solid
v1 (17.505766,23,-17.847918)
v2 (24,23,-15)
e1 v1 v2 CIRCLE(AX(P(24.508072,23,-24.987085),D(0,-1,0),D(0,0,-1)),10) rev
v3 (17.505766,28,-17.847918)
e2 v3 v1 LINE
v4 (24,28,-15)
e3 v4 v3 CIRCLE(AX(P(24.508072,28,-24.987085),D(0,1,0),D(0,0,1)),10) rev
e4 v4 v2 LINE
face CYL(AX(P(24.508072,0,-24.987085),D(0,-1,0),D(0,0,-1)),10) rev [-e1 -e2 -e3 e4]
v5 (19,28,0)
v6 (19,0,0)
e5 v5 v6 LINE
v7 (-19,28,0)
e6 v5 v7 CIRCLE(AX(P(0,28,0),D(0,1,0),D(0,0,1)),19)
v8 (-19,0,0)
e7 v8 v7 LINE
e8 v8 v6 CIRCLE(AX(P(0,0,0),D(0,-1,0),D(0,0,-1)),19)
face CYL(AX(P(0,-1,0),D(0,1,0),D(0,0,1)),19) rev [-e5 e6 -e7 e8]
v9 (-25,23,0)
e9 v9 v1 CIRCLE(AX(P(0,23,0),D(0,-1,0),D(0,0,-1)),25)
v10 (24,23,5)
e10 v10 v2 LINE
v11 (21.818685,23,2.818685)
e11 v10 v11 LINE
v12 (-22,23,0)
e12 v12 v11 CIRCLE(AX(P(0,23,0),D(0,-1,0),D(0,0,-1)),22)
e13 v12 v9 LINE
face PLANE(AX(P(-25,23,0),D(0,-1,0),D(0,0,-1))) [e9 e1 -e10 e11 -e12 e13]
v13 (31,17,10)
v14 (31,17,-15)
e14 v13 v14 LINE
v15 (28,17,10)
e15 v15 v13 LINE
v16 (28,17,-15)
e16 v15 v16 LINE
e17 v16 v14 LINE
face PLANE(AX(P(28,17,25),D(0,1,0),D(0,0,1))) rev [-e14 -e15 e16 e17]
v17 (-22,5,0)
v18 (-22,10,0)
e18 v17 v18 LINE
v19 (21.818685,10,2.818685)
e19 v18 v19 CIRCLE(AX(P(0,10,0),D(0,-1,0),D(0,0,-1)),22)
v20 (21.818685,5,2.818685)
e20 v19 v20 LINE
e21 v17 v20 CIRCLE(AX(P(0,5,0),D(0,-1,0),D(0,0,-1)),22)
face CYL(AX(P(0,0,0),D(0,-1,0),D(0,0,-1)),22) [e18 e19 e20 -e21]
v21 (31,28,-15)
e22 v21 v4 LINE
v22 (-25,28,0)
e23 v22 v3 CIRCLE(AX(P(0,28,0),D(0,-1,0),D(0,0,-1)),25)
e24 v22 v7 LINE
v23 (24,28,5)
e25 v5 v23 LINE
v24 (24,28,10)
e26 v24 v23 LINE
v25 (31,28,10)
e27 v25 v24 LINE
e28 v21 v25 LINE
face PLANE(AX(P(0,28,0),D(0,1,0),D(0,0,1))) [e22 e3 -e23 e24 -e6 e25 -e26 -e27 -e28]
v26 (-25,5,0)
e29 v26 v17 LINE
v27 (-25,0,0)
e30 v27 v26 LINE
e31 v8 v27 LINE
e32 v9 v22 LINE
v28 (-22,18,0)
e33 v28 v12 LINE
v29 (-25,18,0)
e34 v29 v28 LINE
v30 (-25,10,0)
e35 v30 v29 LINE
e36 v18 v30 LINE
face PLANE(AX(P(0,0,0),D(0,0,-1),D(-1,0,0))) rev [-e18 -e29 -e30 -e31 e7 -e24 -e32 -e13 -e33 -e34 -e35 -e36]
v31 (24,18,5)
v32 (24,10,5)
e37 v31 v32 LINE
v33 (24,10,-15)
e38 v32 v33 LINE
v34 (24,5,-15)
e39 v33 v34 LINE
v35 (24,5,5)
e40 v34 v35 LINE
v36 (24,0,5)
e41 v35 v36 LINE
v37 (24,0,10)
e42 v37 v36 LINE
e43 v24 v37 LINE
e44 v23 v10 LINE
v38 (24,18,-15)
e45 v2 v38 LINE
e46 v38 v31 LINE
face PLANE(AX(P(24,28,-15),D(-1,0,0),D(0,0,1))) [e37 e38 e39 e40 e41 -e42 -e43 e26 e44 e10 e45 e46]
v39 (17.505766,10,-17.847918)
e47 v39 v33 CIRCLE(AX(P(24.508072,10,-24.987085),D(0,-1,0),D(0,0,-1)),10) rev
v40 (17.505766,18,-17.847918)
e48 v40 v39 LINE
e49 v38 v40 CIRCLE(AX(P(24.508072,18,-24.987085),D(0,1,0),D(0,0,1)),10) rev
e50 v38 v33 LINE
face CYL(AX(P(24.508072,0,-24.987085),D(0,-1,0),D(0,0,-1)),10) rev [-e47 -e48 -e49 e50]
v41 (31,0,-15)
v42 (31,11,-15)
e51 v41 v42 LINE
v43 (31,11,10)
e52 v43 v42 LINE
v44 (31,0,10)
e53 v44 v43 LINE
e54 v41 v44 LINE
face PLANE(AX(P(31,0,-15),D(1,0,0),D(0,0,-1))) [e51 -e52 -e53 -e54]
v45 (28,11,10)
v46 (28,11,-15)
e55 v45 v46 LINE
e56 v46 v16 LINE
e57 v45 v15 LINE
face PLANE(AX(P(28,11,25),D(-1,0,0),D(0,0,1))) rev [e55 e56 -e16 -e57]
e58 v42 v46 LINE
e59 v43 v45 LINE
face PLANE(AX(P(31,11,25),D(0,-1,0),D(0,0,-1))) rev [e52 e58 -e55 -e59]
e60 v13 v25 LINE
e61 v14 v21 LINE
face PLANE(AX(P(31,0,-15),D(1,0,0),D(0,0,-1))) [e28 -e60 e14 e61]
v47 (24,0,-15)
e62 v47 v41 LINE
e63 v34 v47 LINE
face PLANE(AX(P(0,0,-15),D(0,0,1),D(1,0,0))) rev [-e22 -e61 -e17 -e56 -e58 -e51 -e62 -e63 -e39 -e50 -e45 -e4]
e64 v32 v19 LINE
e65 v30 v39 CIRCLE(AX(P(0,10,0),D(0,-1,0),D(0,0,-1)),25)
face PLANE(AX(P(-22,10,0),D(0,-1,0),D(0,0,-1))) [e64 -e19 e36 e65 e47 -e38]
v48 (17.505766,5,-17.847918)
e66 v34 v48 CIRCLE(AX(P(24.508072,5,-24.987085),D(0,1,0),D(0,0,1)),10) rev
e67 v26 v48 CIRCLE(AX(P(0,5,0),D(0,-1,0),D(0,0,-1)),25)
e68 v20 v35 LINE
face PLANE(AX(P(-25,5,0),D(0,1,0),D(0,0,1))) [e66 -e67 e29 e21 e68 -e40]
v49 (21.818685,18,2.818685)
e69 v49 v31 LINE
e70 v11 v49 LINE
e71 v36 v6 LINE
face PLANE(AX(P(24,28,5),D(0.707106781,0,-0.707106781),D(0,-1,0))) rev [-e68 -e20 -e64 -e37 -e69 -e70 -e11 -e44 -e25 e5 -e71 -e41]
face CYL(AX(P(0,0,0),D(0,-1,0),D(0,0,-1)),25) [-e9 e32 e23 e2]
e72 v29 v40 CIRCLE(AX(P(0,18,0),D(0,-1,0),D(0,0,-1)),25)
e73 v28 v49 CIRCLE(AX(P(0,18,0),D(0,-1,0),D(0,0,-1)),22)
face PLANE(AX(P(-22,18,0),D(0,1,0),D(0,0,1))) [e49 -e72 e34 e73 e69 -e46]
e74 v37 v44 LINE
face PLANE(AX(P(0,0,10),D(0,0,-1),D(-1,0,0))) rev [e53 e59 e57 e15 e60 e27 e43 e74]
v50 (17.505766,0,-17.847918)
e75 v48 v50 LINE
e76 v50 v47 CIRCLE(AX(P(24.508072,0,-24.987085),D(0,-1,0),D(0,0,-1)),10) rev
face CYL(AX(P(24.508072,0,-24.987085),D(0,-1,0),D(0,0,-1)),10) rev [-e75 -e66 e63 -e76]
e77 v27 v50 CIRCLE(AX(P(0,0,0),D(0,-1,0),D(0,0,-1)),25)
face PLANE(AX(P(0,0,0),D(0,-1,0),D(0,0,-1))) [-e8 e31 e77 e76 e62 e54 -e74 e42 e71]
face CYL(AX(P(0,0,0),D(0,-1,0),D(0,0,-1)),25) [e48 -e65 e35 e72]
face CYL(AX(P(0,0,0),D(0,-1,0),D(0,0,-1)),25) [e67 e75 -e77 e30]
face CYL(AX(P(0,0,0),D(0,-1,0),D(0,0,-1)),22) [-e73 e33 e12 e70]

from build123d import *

# Parameters (mm, degrees)
REVOLUCI_N1_ANGLE       = 180
CROQUIS2_R              = 19
CORTAR_EXTRUIR1_DEPTH   = 29
SALIENTE_EXTRUIR1_DEPTH = 15
CROQUIS4_W              = 7
CROQUIS4_H              = 28
SALIENTE_EXTRUIR2_DEPTH = 10
CHAFL_N1_SIZE           = 5
REDONDEO1_R             = 10
CORTAR_EXTRUIR2_DEPTH   = 40


with BuildPart() as part:
    # Croquis1 → Revolución1 (revolve)
    with BuildSketch(Plane.XY):
        Polygon((0, 0), (0, 28), (25, 28), (25, 23), (22, 23), (22, 18), (25, 18), (25, 10), (22, 10), (22, 5), (25, 5), (25, 0), align=None)
    revolve(axis=Axis((0, 0, 0), (0, 1, 0)), revolution_arc=REVOLUCI_N1_ANGLE)

    # Croquis2 → Cortar-Extruir1 (cut)
    with BuildSketch(Plane(origin=(0, 28, 0), x_dir=(1, 0, 0), z_dir=(0, 1, 0))):
        Circle(CROQUIS2_R)
    extrude(amount=-CORTAR_EXTRUIR1_DEPTH, mode=Mode.SUBTRACT)

    # Croquis3 → Saliente-Extruir1 (add)
    with BuildSketch(Plane.XY):
        Polygon((25, 28), (24, 28), (24, 0), (31, 0), (31, 28), align=None)
    extrude(amount=-SALIENTE_EXTRUIR1_DEPTH)

    # Croquis4 → Saliente-Extruir2 (add)
    with BuildSketch(Plane.XY):
        with Locations((27.5, 14)):
            Rectangle(CROQUIS4_W, CROQUIS4_H)
    extrude(amount=SALIENTE_EXTRUIR2_DEPTH)

    # Chaflán1
    # the kernel refuses this chamfer: 5 mm, written as the material it adds along each edge
    with BuildSketch(Plane(origin=(24, 10.14158506, 0), x_dir=(0.027495876610586317, 0, 0.9996219169112968), z_dir=(0, 1, 0))) as chafl_n1_piece_1_section:
        Polygon((CHAFL_N1_SIZE * 0.999621916911, -CHAFL_N1_SIZE * 0.0274958766106), (-CHAFL_N1_SIZE * 0.0274958766106, -CHAFL_N1_SIZE * 0.999621916911), (0, 0), align=None)
    chafl_n1_piece_1 = extrude(amount=30.71682988, mode=Mode.PRIVATE)
    chafl_n1_piece_1 = split(chafl_n1_piece_1, bisect_by=Plane(origin=(23.057401275, 18, 2.044863286), z_dir=(0, -1, 0)), keep=Keep.TOP, mode=Mode.PRIVATE)
    add(chafl_n1_piece_1)
    with BuildSketch(Plane(origin=(24, 10.14158506, 0), x_dir=(0.027495876610586317, 0, 0.9996219169112968), z_dir=(0, 1, 0))) as chafl_n1_piece_2_section:
        Polygon((CHAFL_N1_SIZE * 0.999621916911, -CHAFL_N1_SIZE * 0.0274958766106), (-CHAFL_N1_SIZE * 0.0274958766106, -CHAFL_N1_SIZE * 0.999621916911), (0, 0), align=None)
    chafl_n1_piece_2 = extrude(amount=17.85841494, mode=Mode.PRIVATE)
    chafl_n1_piece_2 = chafl_n1_piece_2 & Plane(origin=(0, 20.5, 0), x_dir=(1, 0, 0), z_dir=(0, -1, 0)) * Cylinder(22, 56, mode=Mode.PRIVATE)
    add(chafl_n1_piece_2)
    with BuildSketch(Plane(origin=(24, 23, 0), x_dir=(0.027495876610586317, 0, 0.9996219169112968), z_dir=(0, 1, 0)), Plane(origin=(24, 0, 0), x_dir=(0.027495876610586317, 0, 0.9996219169112968), z_dir=(0, 1, 0))) as chafl_n1_piece_3:
        Polygon((CHAFL_N1_SIZE * 0.999621916911, -CHAFL_N1_SIZE * 0.0274958766106), (-CHAFL_N1_SIZE * 0.0274958766106, -CHAFL_N1_SIZE * 0.999621916911), (0, 0), align=None)
    extrude(amount=5)
    with BuildSketch(Plane(origin=(24, -2.85841494, 0), x_dir=(0.027495876610586317, 0, 0.9996219169112968), z_dir=(0, 1, 0))) as chafl_n1_piece_4_section:
        Polygon((CHAFL_N1_SIZE * 0.999621916911, -CHAFL_N1_SIZE * 0.0274958766106), (-CHAFL_N1_SIZE * 0.0274958766106, -CHAFL_N1_SIZE * 0.999621916911), (0, 0), align=None)
    chafl_n1_piece_4 = extrude(amount=33.71682988, mode=Mode.PRIVATE)
    chafl_n1_piece_4 = split(chafl_n1_piece_4, bisect_by=Plane(origin=(23.057401275, 0, 2.044863286), z_dir=(0, 1, 0)), keep=Keep.TOP, mode=Mode.PRIVATE)
    chafl_n1_piece_4 = split(chafl_n1_piece_4, bisect_by=Plane(origin=(23.057401275, 5, 2.044863286), z_dir=(0, -1, 0)), keep=Keep.TOP, mode=Mode.PRIVATE)
    add(chafl_n1_piece_4)
    with BuildSketch(Plane(origin=(24, -2.85841494, 0), x_dir=(0.027495876610586317, 0, 0.9996219169112968), z_dir=(0, 1, 0))) as chafl_n1_piece_5_section:
        Polygon((CHAFL_N1_SIZE * 0.999621916911, -CHAFL_N1_SIZE * 0.0274958766106), (-CHAFL_N1_SIZE * 0.0274958766106, -CHAFL_N1_SIZE * 0.999621916911), (0, 0), align=None)
    chafl_n1_piece_5 = extrude(amount=33.71682988, mode=Mode.PRIVATE)
    chafl_n1_piece_5 = split(chafl_n1_piece_5, bisect_by=Plane(origin=(20.959134142, 28, 0.94889219), z_dir=(0, -1, 0)), keep=Keep.TOP, mode=Mode.PRIVATE)
    chafl_n1_piece_5 = split(chafl_n1_piece_5, bisect_by=Plane(origin=(20.959134142, 5, 0.94889219), z_dir=(0, 1, 0)), keep=Keep.TOP, mode=Mode.PRIVATE)
    chafl_n1_piece_5 = chafl_n1_piece_5 & Plane(origin=(0, 7.5, 0), x_dir=(1, 0, 0), z_dir=(0, -1, 0)) * Cylinder(22, 88, mode=Mode.PRIVATE)
    add(chafl_n1_piece_5)
    with BuildSketch(Plane(origin=(24, 10, 0), x_dir=(0.027495876610586317, 0, 0.9996219169112968), z_dir=(0, 1, 0))) as chafl_n1_piece_6:
        Polygon((CHAFL_N1_SIZE * 0.999621916911, -CHAFL_N1_SIZE * 0.0274958766106), (-CHAFL_N1_SIZE * 0.0274958766106, -CHAFL_N1_SIZE * 0.999621916911), (0, 0), align=None)
    extrude(amount=8)
    with BuildSketch(Plane(origin=(24, -2.85841494, 0), x_dir=(0.027495876610586317, 0, 0.9996219169112968), z_dir=(0, 1, 0))) as chafl_n1_piece_7_section:
        Polygon((CHAFL_N1_SIZE * 0.999621916911, -CHAFL_N1_SIZE * 0.0274958766106), (-CHAFL_N1_SIZE * 0.0274958766106, -CHAFL_N1_SIZE * 0.999621916911), (0, 0), align=None)
    chafl_n1_piece_7 = extrude(amount=33.71682988, mode=Mode.PRIVATE)
    chafl_n1_piece_7 = split(chafl_n1_piece_7, bisect_by=Plane(origin=(23.057401275, 28, 2.044863286), z_dir=(0, -1, 0)), keep=Keep.TOP, mode=Mode.PRIVATE)
    chafl_n1_piece_7 = split(chafl_n1_piece_7, bisect_by=Plane(origin=(23.057401275, 23, 2.044863286), z_dir=(0, 1, 0)), keep=Keep.TOP, mode=Mode.PRIVATE)
    add(chafl_n1_piece_7)
    with BuildSketch(Plane(origin=(24, -12.85841494, 0), x_dir=(0.027495876610586317, 0, 0.9996219169112968), z_dir=(0, 1, 0))) as chafl_n1_piece_8_section:
        Polygon((CHAFL_N1_SIZE * 0.999621916911, -CHAFL_N1_SIZE * 0.0274958766106), (-CHAFL_N1_SIZE * 0.0274958766106, -CHAFL_N1_SIZE * 0.999621916911), (0, 0), align=None)
    chafl_n1_piece_8 = extrude(amount=30.71682988, mode=Mode.PRIVATE)
    chafl_n1_piece_8 = split(chafl_n1_piece_8, bisect_by=Plane(origin=(20.959134142, 5, 0.94889219), z_dir=(0, 1, 0)), keep=Keep.TOP, mode=Mode.PRIVATE)
    chafl_n1_piece_8 = chafl_n1_piece_8 & Plane(origin=(0, 7.5, 0), x_dir=(1, 0, 0), z_dir=(0, -1, 0)) * Cylinder(22, 82, mode=Mode.PRIVATE)
    add(chafl_n1_piece_8)
    with BuildSketch(Plane(origin=(24, -12.85841494, 0), x_dir=(0.027495876610586317, 0, 0.9996219169112968), z_dir=(0, 1, 0))) as chafl_n1_piece_9_section:
        Polygon((CHAFL_N1_SIZE * 0.999621916911, -CHAFL_N1_SIZE * 0.0274958766106), (-CHAFL_N1_SIZE * 0.0274958766106, -CHAFL_N1_SIZE * 0.999621916911), (0, 0), align=None)
    chafl_n1_piece_9 = extrude(amount=30.71682988, mode=Mode.PRIVATE)
    chafl_n1_piece_9 = split(chafl_n1_piece_9, bisect_by=Plane(origin=(23.057401275, 10, 2.044863286), z_dir=(0, 1, 0)), keep=Keep.TOP, mode=Mode.PRIVATE)
    add(chafl_n1_piece_9)

    # Redondeo1
    # the kernel refuses this fillet: 10 mm, written as the material it adds along each edge
    with BuildSketch(Plane(origin=(24, 28, -7), x_dir=(-0.5136512800645924, 0, -0.8579990457384005), z_dir=(0, -1, 0)), Plane(origin=(24, 5, -7), x_dir=(-0.5136512800645924, 0, -0.8579990457384005), z_dir=(0, -1, 0))) as redondeo1_piece_1:
        with BuildLine():
            CenterArc((15.171929763, 9.675014423), REDONDEO1_R, 213.819639199, 41.5332183)
            Line((6.863992366, 4.109210241), (0, 0))
            ThreePointArc((0, 0), (6.321637401, 0.812463942), (12.643274803, 0))
        make_face()
    extrude(amount=5)
    with BuildSketch(Plane(origin=(24, 59.608187007, -7), x_dir=(-0.5136512800645924, 0, -0.8579990457384005), z_dir=(0, -1, 0))) as redondeo1_piece_2_section:
        with BuildLine():
            CenterArc((15.171929763, 9.675014423), REDONDEO1_R, 213.819639199, 41.5332183)
            Line((6.863992366, 4.109210241), (0, 0))
            ThreePointArc((0, 0), (6.321637401, 0.812463942), (12.643274803, 0))
        make_face()
    redondeo1_piece_2 = extrude(amount=68.216374014, mode=Mode.PRIVATE)
    redondeo1_piece_2 = split(redondeo1_piece_2, bisect_by=Plane(origin=(20.483934171, 18, -15.810663128), z_dir=(0, -1, 0)), keep=Keep.TOP, mode=Mode.PRIVATE)
    redondeo1_piece_2 = split(redondeo1_piece_2, bisect_by=Plane(origin=(20.483934171, 10, -15.810663128), z_dir=(0, 1, 0)), keep=Keep.TOP, mode=Mode.PRIVATE)
    add(redondeo1_piece_2)
    with BuildSketch(Plane(origin=(24, 59.608187007, -7), x_dir=(-0.5136512800645924, 0, -0.8579990457384005), z_dir=(0, -1, 0))) as redondeo1_piece_3_section:
        with BuildLine():
            CenterArc((15.171929763, 9.675014423), REDONDEO1_R, 213.819639199, 41.5332183)
            Line((6.863992366, 4.109210241), (0, 0))
            ThreePointArc((0, 0), (6.321637401, 0.812463942), (12.643274803, 0))
        make_face()
    redondeo1_piece_3 = extrude(amount=68.216374014, mode=Mode.PRIVATE)
    redondeo1_piece_3 = split(redondeo1_piece_3, bisect_by=Plane(origin=(20.483934171, 5, -15.810663128), z_dir=(0, -1, 0)), keep=Keep.TOP, mode=Mode.PRIVATE)
    redondeo1_piece_3 = split(redondeo1_piece_3, bisect_by=Plane(origin=(20.483934171, 0, -15.810663128), z_dir=(0, 1, 0)), keep=Keep.TOP, mode=Mode.PRIVATE)
    add(redondeo1_piece_3)
    with BuildSketch(Plane(origin=(24, 49.608187007, -7), x_dir=(-0.5136512800645924, 0, -0.8579990457384005), z_dir=(0, -1, 0))) as redondeo1_piece_4_section:
        with BuildLine():
            CenterArc((15.171929763, 9.675014423), REDONDEO1_R, 213.819639199, 41.5332183)
            Line((6.863992366, 4.109210241), (0, 0))
            ThreePointArc((0, 0), (6.321637401, 0.812463942), (12.643274803, 0))
        make_face()
    redondeo1_piece_4 = extrude(amount=71.216374014, mode=Mode.PRIVATE)
    redondeo1_piece_4 = split(redondeo1_piece_4, bisect_by=Plane(origin=(20.483934171, 28, -15.810663128), z_dir=(0, -1, 0)), keep=Keep.TOP, mode=Mode.PRIVATE)
    redondeo1_piece_4 = split(redondeo1_piece_4, bisect_by=Plane(origin=(20.483934171, 23, -15.810663128), z_dir=(0, 1, 0)), keep=Keep.TOP, mode=Mode.PRIVATE)
    add(redondeo1_piece_4)
    with BuildSketch(Plane(origin=(24, 18, -7), x_dir=(-0.5136512800645924, 0, -0.8579990457384005), z_dir=(0, -1, 0))) as redondeo1_piece_5:
        with BuildLine():
            CenterArc((15.171929763, 9.675014423), REDONDEO1_R, 213.819639199, 41.5332183)
            Line((6.863992366, 4.109210241), (0, 0))
            ThreePointArc((0, 0), (6.321637401, 0.812463942), (12.643274803, 0))
        make_face()
    extrude(amount=8)
    with BuildSketch(Plane(origin=(24, 49.608187007, -7), x_dir=(-0.5136512800645924, 0, -0.8579990457384005), z_dir=(0, -1, 0))) as redondeo1_piece_6_section:
        with BuildLine():
            CenterArc((15.171929763, 9.675014423), REDONDEO1_R, 213.819639199, 41.5332183)
            Line((6.863992366, 4.109210241), (0, 0))
            ThreePointArc((0, 0), (6.321637401, 0.812463942), (12.643274803, 0))
        make_face()
    redondeo1_piece_6 = extrude(amount=71.216374014, mode=Mode.PRIVATE)
    redondeo1_piece_6 = split(redondeo1_piece_6, bisect_by=Plane(origin=(20.483934171, 5, -15.810663128), z_dir=(0, -1, 0)), keep=Keep.TOP, mode=Mode.PRIVATE)
    redondeo1_piece_6 = split(redondeo1_piece_6, bisect_by=Plane(origin=(20.483934171, 0, -15.810663128), z_dir=(0, 1, 0)), keep=Keep.TOP, mode=Mode.PRIVATE)
    add(redondeo1_piece_6)
    with BuildSketch(Plane(origin=(24, 36.608187007, -7), x_dir=(-0.5136512800645924, 0, -0.8579990457384005), z_dir=(0, -1, 0))) as redondeo1_piece_7_section:
        with BuildLine():
            CenterArc((15.171929763, 9.675014423), REDONDEO1_R, 213.819639199, 41.5332183)
            Line((6.863992366, 4.109210241), (0, 0))
            ThreePointArc((0, 0), (6.321637401, 0.812463942), (12.643274803, 0))
        make_face()
    redondeo1_piece_7 = extrude(amount=68.216374014, mode=Mode.PRIVATE)
    redondeo1_piece_7 = split(redondeo1_piece_7, bisect_by=Plane(origin=(20.483934171, 28, -15.810663128), z_dir=(0, -1, 0)), keep=Keep.TOP, mode=Mode.PRIVATE)
    redondeo1_piece_7 = split(redondeo1_piece_7, bisect_by=Plane(origin=(20.483934171, 23, -15.810663128), z_dir=(0, 1, 0)), keep=Keep.TOP, mode=Mode.PRIVATE)
    add(redondeo1_piece_7)
    with BuildSketch(Plane(origin=(24, 36.608187007, -7), x_dir=(-0.5136512800645924, 0, -0.8579990457384005), z_dir=(0, -1, 0))) as redondeo1_piece_8_section:
        with BuildLine():
            CenterArc((15.171929763, 9.675014423), REDONDEO1_R, 213.819639199, 41.5332183)
            Line((6.863992366, 4.109210241), (0, 0))
            ThreePointArc((0, 0), (6.321637401, 0.812463942), (12.643274803, 0))
        make_face()
    redondeo1_piece_8 = extrude(amount=68.216374014, mode=Mode.PRIVATE)
    redondeo1_piece_8 = split(redondeo1_piece_8, bisect_by=Plane(origin=(20.483934171, 18, -15.810663128), z_dir=(0, -1, 0)), keep=Keep.TOP, mode=Mode.PRIVATE)
    redondeo1_piece_8 = split(redondeo1_piece_8, bisect_by=Plane(origin=(20.483934171, 10, -15.810663128), z_dir=(0, 1, 0)), keep=Keep.TOP, mode=Mode.PRIVATE)
    add(redondeo1_piece_8)

    # Croquis5 → Cortar-Extruir2 (cut)
    with BuildSketch(Plane(origin=(0, 0, -15), x_dir=(-1, 0, 0), z_dir=(0, 0, -1))):
        Polygon((-31, 14), (-31, 11), (-28, 11), (-28, 17), (-31, 17), align=None)
    extrude(amount=-CORTAR_EXTRUIR2_DEPTH, mode=Mode.SUBTRACT)


solid = part.part
